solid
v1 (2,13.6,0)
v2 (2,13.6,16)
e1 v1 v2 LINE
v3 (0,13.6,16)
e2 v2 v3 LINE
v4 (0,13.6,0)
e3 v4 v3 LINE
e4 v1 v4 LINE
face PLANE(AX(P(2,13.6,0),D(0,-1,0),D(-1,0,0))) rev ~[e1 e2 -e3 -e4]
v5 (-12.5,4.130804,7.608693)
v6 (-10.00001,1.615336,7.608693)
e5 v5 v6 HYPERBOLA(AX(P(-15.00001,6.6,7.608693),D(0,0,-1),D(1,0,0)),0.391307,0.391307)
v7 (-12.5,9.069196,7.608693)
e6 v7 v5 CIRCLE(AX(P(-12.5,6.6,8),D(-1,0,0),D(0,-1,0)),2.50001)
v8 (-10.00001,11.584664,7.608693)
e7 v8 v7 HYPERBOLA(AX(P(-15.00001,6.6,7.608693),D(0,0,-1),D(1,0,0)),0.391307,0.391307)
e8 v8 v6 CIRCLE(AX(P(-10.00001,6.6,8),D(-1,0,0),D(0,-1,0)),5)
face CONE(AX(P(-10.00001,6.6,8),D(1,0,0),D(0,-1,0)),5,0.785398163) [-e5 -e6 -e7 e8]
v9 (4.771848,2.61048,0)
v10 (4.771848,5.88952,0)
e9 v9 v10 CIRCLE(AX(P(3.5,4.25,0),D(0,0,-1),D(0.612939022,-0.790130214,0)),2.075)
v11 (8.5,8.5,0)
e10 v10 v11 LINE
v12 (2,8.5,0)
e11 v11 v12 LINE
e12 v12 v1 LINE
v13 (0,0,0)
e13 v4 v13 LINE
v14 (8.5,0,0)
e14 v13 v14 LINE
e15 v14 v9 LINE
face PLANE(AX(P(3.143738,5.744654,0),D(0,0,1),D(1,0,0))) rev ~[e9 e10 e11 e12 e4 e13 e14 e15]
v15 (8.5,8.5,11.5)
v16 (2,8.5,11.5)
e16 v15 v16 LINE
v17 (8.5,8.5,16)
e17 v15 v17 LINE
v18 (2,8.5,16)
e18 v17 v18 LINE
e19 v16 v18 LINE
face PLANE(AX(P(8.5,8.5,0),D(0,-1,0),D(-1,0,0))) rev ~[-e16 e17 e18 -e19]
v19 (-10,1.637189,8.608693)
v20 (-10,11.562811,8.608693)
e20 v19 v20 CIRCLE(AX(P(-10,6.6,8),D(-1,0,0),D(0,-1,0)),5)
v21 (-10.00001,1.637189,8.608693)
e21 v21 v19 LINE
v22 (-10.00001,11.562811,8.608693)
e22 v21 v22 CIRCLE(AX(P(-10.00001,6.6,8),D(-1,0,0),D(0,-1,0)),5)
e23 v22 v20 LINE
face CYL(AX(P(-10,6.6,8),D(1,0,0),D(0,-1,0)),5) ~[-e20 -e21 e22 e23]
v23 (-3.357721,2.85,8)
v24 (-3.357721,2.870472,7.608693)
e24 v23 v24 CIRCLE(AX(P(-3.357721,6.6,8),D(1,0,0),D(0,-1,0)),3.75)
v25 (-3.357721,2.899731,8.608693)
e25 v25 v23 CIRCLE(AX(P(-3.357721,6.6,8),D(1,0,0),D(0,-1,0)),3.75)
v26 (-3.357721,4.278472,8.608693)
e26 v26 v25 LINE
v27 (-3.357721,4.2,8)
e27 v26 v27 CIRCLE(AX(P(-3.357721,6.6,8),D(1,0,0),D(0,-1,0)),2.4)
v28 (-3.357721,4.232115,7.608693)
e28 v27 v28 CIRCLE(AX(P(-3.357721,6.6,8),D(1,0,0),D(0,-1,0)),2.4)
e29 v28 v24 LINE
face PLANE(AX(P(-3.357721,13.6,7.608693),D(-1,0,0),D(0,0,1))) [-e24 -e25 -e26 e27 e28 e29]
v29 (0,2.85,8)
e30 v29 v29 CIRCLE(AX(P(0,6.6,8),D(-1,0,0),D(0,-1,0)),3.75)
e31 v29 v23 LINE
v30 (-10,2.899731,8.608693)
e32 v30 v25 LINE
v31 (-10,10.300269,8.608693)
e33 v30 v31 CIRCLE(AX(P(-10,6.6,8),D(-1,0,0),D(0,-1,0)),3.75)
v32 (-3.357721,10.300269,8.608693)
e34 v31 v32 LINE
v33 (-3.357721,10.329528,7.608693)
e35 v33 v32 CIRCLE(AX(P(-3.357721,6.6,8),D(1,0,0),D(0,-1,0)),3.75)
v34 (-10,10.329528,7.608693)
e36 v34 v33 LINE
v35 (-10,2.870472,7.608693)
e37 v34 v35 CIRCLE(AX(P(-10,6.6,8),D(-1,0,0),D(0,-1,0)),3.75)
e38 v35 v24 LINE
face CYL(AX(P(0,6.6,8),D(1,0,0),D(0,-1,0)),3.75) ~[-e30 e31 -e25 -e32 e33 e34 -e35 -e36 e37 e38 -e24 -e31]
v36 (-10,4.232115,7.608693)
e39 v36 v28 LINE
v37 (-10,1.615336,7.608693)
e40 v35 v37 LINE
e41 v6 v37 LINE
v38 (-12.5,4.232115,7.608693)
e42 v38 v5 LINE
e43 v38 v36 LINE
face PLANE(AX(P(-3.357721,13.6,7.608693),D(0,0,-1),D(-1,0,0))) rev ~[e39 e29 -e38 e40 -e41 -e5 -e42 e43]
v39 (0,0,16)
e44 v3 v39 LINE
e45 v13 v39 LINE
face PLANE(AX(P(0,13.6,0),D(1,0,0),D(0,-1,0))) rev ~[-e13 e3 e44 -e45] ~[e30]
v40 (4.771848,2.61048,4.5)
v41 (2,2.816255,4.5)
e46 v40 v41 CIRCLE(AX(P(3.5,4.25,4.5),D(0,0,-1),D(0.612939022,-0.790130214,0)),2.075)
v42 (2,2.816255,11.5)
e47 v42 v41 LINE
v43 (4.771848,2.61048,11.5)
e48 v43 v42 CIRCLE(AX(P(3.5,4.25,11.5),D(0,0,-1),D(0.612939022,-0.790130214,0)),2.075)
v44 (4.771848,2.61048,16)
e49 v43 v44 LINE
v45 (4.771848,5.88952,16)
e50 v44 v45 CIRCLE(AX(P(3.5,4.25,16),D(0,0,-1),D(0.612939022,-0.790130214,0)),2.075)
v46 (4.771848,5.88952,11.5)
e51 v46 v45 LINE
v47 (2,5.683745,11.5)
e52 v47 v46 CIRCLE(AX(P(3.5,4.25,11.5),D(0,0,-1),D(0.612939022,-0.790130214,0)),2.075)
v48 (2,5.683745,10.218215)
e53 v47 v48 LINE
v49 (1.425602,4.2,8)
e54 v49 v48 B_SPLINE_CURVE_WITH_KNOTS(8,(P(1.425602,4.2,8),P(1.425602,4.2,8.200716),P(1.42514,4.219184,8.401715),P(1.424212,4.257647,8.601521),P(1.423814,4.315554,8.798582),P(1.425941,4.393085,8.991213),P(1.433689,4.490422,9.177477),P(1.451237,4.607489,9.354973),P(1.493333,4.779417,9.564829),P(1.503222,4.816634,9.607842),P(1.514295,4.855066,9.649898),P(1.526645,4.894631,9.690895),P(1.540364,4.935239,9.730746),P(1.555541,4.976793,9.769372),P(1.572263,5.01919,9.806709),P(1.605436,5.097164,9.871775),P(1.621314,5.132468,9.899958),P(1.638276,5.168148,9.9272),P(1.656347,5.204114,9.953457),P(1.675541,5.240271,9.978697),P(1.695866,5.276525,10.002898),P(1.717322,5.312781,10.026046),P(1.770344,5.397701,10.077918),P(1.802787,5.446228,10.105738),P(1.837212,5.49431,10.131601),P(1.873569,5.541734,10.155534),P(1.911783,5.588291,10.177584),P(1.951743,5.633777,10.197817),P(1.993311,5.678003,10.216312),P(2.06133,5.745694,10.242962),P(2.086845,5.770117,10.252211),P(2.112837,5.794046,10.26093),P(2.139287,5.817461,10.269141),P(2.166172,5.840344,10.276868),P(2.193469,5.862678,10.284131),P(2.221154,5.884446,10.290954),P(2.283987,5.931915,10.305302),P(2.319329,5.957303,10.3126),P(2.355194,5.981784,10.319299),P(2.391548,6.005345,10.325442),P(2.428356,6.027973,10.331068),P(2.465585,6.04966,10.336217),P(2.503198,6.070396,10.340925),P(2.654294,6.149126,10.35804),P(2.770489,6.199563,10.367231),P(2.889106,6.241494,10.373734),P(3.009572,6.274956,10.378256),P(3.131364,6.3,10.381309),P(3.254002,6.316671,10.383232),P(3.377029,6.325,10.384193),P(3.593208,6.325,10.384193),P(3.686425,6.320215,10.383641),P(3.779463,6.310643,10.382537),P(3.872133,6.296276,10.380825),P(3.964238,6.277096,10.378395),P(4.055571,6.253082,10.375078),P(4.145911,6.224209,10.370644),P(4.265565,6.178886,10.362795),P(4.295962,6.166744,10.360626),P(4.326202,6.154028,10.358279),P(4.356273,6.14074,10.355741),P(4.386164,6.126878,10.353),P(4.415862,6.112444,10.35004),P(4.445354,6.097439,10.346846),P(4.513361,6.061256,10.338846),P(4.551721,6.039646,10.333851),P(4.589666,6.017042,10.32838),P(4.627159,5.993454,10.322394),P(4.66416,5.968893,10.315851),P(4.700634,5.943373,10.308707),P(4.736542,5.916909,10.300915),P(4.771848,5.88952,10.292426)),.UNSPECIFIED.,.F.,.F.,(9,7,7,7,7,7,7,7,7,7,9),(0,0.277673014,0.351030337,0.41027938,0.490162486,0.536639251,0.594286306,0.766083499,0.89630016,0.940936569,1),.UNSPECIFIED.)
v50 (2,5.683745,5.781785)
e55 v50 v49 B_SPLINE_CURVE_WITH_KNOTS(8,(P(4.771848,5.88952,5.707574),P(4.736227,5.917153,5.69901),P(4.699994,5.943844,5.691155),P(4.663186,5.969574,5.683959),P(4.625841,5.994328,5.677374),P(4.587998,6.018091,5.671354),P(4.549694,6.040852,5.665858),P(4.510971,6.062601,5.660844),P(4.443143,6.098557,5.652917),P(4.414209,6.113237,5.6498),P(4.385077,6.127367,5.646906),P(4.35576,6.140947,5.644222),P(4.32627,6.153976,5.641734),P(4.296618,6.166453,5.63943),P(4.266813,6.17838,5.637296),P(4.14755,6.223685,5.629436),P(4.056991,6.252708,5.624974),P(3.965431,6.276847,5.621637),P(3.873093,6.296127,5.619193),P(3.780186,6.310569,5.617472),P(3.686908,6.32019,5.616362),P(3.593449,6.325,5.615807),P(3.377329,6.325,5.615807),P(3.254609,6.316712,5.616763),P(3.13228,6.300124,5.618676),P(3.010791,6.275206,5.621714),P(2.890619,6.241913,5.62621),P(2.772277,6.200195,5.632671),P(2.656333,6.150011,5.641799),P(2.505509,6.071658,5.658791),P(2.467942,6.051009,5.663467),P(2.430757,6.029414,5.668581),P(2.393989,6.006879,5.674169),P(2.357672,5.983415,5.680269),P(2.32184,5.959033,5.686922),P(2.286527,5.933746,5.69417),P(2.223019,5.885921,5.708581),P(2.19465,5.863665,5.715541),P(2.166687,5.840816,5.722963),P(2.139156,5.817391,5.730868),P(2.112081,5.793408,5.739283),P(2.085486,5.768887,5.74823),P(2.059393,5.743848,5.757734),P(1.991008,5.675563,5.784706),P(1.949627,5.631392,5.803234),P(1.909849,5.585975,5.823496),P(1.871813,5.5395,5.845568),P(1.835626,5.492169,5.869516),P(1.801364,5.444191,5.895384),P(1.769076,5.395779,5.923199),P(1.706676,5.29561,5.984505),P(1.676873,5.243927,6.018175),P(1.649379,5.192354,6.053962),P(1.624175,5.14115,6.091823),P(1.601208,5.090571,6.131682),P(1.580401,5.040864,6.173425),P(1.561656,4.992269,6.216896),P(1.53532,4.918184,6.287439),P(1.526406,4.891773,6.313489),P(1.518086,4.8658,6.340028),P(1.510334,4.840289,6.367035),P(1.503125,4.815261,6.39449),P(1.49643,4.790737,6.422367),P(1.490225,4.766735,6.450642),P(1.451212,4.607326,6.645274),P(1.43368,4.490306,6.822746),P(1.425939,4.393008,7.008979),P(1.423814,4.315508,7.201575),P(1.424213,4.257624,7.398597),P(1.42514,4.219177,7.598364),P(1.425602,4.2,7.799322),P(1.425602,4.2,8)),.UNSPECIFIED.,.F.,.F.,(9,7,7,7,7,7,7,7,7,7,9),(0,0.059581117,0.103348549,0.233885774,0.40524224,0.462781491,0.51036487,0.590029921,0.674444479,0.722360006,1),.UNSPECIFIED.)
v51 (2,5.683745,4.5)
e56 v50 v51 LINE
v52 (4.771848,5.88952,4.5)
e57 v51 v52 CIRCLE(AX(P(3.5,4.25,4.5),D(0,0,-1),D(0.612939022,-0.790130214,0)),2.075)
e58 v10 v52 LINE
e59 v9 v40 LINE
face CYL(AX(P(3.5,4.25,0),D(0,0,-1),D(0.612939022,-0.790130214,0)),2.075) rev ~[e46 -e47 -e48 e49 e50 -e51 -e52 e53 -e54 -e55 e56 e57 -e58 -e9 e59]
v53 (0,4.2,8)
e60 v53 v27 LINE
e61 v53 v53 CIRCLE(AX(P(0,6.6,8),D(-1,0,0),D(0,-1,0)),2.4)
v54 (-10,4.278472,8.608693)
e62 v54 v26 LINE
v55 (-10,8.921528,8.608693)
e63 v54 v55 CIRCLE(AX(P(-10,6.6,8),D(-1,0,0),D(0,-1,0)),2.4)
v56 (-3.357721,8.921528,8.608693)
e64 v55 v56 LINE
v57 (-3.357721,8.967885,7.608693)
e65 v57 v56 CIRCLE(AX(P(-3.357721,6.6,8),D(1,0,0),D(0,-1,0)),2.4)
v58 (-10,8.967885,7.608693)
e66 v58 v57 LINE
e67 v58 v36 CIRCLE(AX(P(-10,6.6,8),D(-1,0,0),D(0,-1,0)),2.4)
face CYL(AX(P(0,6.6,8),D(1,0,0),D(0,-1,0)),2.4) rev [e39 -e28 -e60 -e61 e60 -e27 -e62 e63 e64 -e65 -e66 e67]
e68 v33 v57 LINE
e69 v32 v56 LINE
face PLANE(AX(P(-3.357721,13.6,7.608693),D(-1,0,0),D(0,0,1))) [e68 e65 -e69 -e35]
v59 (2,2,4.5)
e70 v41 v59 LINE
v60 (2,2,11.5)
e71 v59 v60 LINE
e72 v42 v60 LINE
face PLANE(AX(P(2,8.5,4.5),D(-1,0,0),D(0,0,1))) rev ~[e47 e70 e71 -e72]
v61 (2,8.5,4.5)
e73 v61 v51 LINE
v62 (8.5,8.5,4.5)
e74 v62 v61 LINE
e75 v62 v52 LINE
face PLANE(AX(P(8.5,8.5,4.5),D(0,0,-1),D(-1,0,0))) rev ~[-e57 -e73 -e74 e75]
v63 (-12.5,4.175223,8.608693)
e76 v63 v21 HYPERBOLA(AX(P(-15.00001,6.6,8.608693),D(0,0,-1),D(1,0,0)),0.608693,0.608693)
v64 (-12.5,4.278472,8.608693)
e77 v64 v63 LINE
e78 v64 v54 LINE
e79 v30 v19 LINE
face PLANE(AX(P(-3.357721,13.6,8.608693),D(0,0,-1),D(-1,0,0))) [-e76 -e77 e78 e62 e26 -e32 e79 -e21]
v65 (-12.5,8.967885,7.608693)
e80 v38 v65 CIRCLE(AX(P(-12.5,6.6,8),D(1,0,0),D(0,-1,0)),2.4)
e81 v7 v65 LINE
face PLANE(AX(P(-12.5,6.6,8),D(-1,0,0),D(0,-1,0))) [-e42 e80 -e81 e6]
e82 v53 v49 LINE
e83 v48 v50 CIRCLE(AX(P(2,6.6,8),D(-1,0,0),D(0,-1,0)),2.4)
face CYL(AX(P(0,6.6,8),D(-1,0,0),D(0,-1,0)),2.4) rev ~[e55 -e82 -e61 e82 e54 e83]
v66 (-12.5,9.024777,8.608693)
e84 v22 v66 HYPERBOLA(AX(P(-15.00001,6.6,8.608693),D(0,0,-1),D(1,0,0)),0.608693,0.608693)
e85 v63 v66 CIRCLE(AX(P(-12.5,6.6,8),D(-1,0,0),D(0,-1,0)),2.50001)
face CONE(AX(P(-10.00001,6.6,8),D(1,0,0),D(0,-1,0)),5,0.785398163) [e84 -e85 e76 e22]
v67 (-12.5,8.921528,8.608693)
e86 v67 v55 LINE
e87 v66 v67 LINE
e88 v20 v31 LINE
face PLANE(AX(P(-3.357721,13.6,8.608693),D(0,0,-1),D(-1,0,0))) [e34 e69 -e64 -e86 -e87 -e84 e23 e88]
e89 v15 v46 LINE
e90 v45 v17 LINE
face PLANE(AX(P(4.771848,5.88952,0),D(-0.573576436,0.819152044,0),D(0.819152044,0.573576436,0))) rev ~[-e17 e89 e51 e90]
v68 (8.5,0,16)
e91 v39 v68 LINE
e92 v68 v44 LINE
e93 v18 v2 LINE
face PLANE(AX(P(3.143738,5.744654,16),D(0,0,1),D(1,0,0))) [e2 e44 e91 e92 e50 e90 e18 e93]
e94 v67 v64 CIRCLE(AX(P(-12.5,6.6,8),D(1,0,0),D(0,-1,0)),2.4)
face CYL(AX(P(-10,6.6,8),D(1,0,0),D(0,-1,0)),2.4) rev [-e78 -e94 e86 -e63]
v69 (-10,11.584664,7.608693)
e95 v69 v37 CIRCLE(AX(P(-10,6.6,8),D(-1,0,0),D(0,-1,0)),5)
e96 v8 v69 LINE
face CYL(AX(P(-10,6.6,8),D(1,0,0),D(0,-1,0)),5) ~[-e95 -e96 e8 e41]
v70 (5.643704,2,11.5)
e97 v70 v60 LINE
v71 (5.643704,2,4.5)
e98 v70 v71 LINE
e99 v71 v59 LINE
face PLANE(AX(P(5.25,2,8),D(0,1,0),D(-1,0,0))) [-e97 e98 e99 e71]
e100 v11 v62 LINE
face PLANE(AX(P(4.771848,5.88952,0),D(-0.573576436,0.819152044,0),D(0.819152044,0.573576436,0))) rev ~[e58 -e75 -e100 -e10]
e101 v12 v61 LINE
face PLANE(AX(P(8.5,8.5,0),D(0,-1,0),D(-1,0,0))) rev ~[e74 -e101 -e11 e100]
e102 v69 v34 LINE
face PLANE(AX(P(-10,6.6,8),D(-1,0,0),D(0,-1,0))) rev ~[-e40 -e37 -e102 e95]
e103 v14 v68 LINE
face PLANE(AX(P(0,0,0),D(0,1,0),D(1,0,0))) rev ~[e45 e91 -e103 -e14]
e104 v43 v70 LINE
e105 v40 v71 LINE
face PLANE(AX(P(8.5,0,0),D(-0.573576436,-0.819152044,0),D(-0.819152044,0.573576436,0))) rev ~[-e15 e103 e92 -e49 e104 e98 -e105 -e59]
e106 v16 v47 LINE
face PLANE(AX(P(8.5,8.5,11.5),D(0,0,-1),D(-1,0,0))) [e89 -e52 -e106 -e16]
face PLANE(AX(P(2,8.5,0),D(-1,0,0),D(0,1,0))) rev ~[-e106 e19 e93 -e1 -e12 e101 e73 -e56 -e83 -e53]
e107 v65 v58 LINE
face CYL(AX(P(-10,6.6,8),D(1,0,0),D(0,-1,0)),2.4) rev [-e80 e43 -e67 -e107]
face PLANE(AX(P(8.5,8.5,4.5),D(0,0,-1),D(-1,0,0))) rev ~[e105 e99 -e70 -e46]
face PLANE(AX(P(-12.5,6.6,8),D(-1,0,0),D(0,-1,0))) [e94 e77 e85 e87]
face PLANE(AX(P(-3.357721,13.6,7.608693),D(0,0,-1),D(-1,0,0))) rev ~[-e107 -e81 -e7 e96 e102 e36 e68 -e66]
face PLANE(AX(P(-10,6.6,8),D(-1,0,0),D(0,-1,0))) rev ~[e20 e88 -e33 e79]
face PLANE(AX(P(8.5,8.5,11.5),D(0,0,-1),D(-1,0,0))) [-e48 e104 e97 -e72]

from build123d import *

# Parameters (mm, degrees)
F1_DEPTH  = 16
F2_W      = 6.5
F2_H      = 7
F3_DEPTH  = 6.5
F4_R      = 3.75
F4_R_2    = 2.4
F5_DEPTH  = 10
F6_DEPTH  = 8
F7_R      = 5
F8_DEPTH  = 2.5
F9_DEPTH  = 5
F10_SIZE2 = 2.49999
F10_SIZE  = 2.49999
F11_W     = 9.2321852261
F11_H     = 1
F12_DEPTH = 25


# Not quite as in the source:
# - a fillet or chamfer is up to 0.001 mm smaller than in the source, because OpenCascade refuses the exact size


with BuildPart() as f1:
    # F0 (on Top) → F1 (new body)
    with BuildSketch(Plane.XY):
        with BuildLine():
            Line((2, 13.6), (0, 13.6))
            Line((0, 13.6), (0, 0))
            Line((0, 0), (8.5, 0))
            Line((8.5, 0), (4.7718484698, 2.610479805))
            ThreePointArc((4.7718484698, 2.610479805), (1.425, 4.25), (4.7718484698, 5.889520195))
            Line((4.7718484698, 5.889520195), (8.5, 8.5))
            Line((8.5, 8.5), (2, 8.5))
            Line((2, 8.5), (2, 13.6))
        make_face()
    extrude(amount=F1_DEPTH)

    # F2 (on face) → F3 (cut)
    with BuildSketch(Plane(origin=(0, 8.5, 0), x_dir=(-1, 0, 0), z_dir=(0, 1, 0))):
        with Locations((-5.25, 8)):
            Rectangle(F2_W, F2_H)
    extrude(amount=-F3_DEPTH, mode=Mode.SUBTRACT)

    # F4 (on face) → F5 (join)
    with BuildSketch(Plane(origin=(0, 0, 0), x_dir=(0, -1, 0), z_dir=(-1, 0, 0))):
        with Locations((-6.6, 8)):
            Circle(F4_R)
        with Locations((-6.6, 8)):
            Circle(F4_R_2, mode=Mode.SUBTRACT)
    extrude(amount=F5_DEPTH)

    # F6 (cut): a face of the model
    f6_faces = [f1.faces().sort_by_distance(p)[0] for p in [
        (0, 6.6, 8),
    ]]
    extrude(f6_faces, amount=-F6_DEPTH, mode=Mode.SUBTRACT)

    # F7 (on face) → F8 (join)
    with BuildSketch(Plane(origin=(-10, 0, 0), x_dir=(0, -1, 0), z_dir=(-1, 0, 0))):
        with Locations((-6.6, 8)):
            Circle(F7_R)
    extrude(amount=F8_DEPTH)

    # F9 (cut): a face of the model
    f9_faces = [f1.faces().sort_by_distance(p)[0] for p in [
        (-10, 6.6, 8),
    ]]
    extrude(f9_faces, amount=-F9_DEPTH, mode=Mode.SUBTRACT)

    # F10 (size 2.5 and 2.5 in the source; OpenCascade refuses exactly that, so slightly less here)
    f10_edges = [f1.edges().sort_by_distance(p)[0] for p in [
        (-12.5, 11.6, 8),
    ]]
    chamfer(f10_edges, length=F10_SIZE, length2=F10_SIZE2)

    # F11 (on face) → F12 (cut)
    with BuildSketch(Plane(origin=(0, 13.6, 0), x_dir=(-1, 0, 0), z_dir=(0, 1, 0))):
        with Locations((7.9738140339, 8.1086927094)):
            Rectangle(F11_W, F11_H)
    extrude(amount=-F12_DEPTH, mode=Mode.SUBTRACT)


solid = f1.part
